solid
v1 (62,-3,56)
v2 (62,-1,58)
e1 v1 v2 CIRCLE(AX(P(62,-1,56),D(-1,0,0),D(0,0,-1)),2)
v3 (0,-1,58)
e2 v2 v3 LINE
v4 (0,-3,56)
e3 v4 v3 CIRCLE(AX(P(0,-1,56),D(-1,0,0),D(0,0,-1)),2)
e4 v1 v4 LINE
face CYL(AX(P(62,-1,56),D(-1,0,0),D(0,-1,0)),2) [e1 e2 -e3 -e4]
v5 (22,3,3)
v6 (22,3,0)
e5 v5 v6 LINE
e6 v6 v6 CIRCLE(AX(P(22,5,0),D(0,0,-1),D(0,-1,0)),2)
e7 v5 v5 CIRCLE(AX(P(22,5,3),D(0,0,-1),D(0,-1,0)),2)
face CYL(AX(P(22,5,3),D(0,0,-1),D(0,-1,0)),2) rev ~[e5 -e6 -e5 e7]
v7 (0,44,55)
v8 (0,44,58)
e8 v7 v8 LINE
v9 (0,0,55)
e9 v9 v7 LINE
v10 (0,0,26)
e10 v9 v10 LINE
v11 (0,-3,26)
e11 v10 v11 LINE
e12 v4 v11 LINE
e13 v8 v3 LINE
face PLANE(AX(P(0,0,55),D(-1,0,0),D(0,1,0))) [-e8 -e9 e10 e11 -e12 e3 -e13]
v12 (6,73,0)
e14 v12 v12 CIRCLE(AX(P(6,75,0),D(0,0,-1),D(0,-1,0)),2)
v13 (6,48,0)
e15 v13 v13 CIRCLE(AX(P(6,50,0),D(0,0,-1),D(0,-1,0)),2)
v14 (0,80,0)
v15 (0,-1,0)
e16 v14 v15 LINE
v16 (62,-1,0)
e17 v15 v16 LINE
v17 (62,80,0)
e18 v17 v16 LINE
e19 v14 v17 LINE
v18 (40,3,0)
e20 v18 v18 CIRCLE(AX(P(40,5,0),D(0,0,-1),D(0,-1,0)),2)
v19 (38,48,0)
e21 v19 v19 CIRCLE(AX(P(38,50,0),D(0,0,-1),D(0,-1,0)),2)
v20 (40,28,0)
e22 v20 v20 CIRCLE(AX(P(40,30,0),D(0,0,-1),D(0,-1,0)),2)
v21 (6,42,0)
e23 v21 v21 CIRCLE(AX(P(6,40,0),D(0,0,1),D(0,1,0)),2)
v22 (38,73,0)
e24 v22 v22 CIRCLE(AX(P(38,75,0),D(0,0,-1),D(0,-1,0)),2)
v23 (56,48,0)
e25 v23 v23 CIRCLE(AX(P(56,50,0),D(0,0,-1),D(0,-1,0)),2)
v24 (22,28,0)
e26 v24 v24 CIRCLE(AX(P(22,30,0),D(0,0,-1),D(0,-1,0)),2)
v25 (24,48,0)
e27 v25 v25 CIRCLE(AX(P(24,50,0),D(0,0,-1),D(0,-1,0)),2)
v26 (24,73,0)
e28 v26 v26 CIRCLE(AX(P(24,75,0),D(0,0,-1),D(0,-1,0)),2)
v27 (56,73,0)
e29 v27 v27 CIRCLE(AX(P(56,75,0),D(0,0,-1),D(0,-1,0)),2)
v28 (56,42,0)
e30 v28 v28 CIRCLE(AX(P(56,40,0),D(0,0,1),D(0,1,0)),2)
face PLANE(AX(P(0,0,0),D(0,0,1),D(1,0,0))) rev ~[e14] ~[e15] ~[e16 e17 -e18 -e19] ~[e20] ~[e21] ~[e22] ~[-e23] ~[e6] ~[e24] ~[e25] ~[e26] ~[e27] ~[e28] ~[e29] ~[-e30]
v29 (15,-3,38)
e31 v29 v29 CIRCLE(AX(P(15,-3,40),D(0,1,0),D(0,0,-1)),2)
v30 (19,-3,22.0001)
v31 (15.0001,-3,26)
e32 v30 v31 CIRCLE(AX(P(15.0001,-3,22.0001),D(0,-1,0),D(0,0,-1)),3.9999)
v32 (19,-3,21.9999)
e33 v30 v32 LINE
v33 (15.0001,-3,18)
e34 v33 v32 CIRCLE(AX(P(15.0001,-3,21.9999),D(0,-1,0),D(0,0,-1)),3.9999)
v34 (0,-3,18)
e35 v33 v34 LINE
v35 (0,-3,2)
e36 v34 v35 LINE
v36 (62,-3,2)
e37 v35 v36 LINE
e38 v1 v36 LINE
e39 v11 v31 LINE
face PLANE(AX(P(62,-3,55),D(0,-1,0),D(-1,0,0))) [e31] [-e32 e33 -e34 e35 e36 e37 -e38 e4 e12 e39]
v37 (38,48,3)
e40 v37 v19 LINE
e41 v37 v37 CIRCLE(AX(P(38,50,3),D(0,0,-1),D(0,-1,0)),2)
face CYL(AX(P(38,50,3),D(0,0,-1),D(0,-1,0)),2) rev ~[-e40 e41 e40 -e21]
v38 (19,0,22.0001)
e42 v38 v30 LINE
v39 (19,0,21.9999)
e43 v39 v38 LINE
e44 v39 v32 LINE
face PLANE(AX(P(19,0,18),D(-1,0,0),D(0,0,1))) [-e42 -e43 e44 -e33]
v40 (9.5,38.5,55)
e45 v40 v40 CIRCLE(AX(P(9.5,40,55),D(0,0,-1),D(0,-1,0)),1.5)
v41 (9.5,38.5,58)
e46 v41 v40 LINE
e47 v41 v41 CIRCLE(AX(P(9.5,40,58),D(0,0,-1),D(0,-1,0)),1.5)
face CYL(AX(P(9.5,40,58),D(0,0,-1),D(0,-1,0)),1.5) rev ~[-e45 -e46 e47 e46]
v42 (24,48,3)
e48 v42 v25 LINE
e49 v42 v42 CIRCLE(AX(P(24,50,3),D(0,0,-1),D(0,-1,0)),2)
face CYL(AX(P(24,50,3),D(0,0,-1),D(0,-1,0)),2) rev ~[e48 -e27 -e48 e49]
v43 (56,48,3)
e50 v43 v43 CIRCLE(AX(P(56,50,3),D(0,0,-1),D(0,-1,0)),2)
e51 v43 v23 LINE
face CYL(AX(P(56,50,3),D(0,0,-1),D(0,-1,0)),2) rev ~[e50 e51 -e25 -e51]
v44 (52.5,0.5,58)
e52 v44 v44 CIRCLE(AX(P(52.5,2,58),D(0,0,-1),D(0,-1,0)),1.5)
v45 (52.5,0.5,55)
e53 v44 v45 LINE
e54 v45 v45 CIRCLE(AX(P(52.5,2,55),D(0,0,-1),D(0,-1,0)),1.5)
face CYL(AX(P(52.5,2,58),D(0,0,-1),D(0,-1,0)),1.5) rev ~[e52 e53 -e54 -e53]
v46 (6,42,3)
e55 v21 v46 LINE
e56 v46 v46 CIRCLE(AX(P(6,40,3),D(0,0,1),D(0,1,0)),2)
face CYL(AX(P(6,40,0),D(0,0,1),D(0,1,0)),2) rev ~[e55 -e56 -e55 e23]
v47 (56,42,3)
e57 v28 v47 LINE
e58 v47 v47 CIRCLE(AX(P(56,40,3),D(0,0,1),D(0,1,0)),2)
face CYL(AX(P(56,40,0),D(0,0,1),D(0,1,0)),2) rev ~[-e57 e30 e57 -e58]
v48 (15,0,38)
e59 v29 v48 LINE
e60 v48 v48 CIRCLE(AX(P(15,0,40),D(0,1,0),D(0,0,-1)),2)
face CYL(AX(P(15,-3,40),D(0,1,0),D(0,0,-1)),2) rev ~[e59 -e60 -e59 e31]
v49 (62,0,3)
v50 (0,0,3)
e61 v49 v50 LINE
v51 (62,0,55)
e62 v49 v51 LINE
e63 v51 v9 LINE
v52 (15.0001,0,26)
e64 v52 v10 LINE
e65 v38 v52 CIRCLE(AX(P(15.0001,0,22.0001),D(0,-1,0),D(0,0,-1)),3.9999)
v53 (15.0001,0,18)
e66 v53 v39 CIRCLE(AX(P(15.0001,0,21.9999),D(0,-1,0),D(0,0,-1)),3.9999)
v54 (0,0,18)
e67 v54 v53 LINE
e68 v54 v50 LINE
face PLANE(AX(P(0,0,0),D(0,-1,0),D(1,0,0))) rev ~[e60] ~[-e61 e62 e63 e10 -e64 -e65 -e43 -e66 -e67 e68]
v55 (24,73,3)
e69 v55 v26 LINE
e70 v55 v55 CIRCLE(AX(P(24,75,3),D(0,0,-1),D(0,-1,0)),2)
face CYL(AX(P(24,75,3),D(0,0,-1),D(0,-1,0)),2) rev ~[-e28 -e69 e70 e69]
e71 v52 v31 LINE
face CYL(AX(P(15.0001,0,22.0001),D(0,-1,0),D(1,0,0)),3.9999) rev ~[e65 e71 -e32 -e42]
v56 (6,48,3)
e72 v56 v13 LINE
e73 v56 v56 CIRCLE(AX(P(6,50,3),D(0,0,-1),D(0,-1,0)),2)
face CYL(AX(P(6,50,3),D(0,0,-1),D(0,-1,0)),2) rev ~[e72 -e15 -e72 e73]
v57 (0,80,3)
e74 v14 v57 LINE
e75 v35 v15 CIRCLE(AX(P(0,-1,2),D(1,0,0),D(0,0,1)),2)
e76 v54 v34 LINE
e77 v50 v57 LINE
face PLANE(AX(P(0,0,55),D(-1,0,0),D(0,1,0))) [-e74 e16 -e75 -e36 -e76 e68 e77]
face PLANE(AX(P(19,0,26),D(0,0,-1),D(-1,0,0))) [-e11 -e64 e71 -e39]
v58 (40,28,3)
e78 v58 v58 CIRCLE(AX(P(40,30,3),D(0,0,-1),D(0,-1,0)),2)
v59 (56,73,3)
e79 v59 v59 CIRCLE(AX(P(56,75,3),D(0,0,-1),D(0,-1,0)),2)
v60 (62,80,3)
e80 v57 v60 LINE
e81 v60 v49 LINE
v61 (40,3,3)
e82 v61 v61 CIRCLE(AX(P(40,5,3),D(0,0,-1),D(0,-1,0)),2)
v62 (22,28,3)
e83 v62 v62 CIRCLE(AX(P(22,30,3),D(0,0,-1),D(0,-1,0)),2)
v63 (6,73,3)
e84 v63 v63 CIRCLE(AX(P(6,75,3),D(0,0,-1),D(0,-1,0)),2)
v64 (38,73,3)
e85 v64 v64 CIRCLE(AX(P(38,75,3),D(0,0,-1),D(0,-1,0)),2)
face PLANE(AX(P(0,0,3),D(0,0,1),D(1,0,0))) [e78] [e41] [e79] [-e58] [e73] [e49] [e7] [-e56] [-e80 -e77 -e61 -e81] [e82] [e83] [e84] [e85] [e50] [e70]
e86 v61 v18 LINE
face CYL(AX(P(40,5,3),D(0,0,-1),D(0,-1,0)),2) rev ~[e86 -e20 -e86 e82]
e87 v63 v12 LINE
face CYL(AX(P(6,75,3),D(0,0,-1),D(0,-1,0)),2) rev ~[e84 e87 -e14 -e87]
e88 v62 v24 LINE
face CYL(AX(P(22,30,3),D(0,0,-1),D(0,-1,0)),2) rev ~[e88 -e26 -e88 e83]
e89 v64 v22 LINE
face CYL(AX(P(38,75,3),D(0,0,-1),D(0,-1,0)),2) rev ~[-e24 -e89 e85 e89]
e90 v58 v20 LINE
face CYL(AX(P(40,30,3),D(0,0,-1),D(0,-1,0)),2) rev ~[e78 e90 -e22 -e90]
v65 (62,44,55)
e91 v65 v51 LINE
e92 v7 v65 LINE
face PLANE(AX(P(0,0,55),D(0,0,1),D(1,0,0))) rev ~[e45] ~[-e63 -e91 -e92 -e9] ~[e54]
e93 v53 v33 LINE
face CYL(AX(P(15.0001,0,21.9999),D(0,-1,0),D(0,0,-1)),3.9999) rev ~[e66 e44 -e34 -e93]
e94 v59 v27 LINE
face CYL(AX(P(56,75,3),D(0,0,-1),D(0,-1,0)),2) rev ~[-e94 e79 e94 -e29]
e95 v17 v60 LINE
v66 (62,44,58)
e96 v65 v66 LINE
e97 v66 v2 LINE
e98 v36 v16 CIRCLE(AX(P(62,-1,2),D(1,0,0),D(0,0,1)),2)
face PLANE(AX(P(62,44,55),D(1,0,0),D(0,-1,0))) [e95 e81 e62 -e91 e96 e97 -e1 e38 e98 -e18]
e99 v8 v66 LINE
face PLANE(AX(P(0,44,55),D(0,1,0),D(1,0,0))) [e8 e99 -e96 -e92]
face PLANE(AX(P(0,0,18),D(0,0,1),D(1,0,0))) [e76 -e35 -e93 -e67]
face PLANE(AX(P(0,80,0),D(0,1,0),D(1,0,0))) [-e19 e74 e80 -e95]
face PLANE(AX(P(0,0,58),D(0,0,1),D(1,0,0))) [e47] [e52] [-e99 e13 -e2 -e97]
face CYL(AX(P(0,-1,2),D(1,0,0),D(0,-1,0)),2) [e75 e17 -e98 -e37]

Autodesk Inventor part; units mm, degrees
ref_plane "YZ Plane" through (0, 0, 0) normal (1, 0, 0) x (0, 1, 0)
ref_plane "XZ Plane" through (0, 0, 0) normal (0, 1, 0) x (-1, 0, 0)
ref_plane "XY Plane" through (0, 0, 0) normal (0, 0, 1) x (1, 0, 0)
sketch "Szkic1" plane through (0, 0, 0) normal (0, 0, 1) x (1, 0, 0)
  line L0 (0, 80) -> (62, 80)
  line L1 (62, 80) -> (62, 0)
  line L2 (62, 0) -> (0, 0)
  line L3 (0, 0) -> (0, 80)
  point P0 (0, 0)
  dimension "d0" = 80
  dimension "d1" = 62
extrude "Wyciągnięcie proste1" add sketch "Szkic1" along normal blind 3
sketch "Szkic2" plane through (0, 0, 3) normal (0, 0, 1) x (1, 0, 0)
  line L0 (0, 80) -> (0, 0) projected
  line L1 (62, 80) -> (0, 80) projected
  line L2 (31, 80) -> (31, 0) construction
  line L3 (0, 0) -> (62, 0) projected
  line L4 (56, 75) -> (56, 50) construction
  line L5 (56, 62.5) -> (62, 62.5) construction
  line L6 (40, 30) -> (40, 5) construction
  line L7 (40, 17.5) -> (62.4441, 17.5) construction
  point P0 (6, 75)
  point P1 (24, 75)
  point P2 (24, 50)
  point P3 (6, 50)
  point P4 (38, 50)
  point P5 (38, 75)
  point P6 (22, 30)
  point P7 (22, 5)
  dimension "d4" = 18
  dimension "d5" = 25
  dimension "d6" = 6
  dimension "d7" = 5
  dimension "d10" = 32
  dimension "d15" = 18
  dimension "d16" = 25
  dimension "d17" = 45
hole "Otwór1" at (6, 75, 3) at (24, 75, 3) at (24, 50, 3) at (6, 50, 3) at (38, 50, 3) at (56, 50, 3) at (56, 75, 3) at (38, 75, 3) at (22, 30, 3) at (40, 30, 3) at (40, 5, 3) at (22, 5, 3) direction (0, 0, -1) diameter 4 end through all
sketch "Szkic3" plane through (0, 0, 0) normal (0, -1, 0) x (1, 0, 0)
  line L0 (0, 0) -> (62, 0)
  line L1 (62, 0) -> (62, 55)
  line L2 (62, 55) -> (0, 55)
  line L3 (0, 55) -> (0, 0)
  line L4 (62, 0) -> (62, 3) projected
  point P0 (62, 1.5)
  dimension "d25" = 55
extrude "Wyciągnięcie proste2" add sketch "Szkic3" along normal blind 3
sketch "Szkic4" plane through (0, 0, 55) normal (0, 0, 1) x (1, 0, 0)
  line L0 (62, 80) -> (62, -3) projected
  line L1 (62, -3) -> (0, -3)
  line L2 (0, -3) -> (0, 44)
  line L3 (0, 44) -> (62, 44)
  line L4 (62, 44) -> (62, -3)
  line L5 (0, 0) -> (0, -3) projected
  point P0 (0, -1.5)
  dimension "d28" = 47
extrude "Wyciągnięcie proste3" add sketch "Szkic4" along normal blind 3
sketch "Szkic5" plane through (0, 0, 0) normal (0, 0, -1) x (-1, 0, 0)
  line L0 (0, -3) -> (-62, -3) projected
  line L1 (0, -3) -> (0, 80) projected
  line L2 (-31, -3) -> (-31, 80) construction
  line L3 (-62, 80) -> (0, 80) projected
  point P0 (0, 0)
  point P1 (-6, 40)
  point P2 (-56, 40)
  dimension "d31" = 43
  dimension "d32" = 6
hole "Otwór2" at (6, 40, 0) at (56, 40, 0) direction (0, 0, 1) diameter 4 end up to surface
thread "Gwint1" size "M4x0.7" class "6H" standard "ANSI Metric M Profile" full length
thread "Gwint2" size "M4x0.7" class "6H" standard "ANSI Metric M Profile" full length
thread "Gwint3" size "M4x0.7" class "6H" standard "ANSI Metric M Profile" full length
thread "Gwint4" size "M4x0.7" class "6H" standard "ANSI Metric M Profile" full length
thread "Gwint5" size "M4x0.7" class "6H" standard "ANSI Metric M Profile" full length
thread "Gwint6" size "M4x0.7" class "6H" standard "ANSI Metric M Profile" full length
thread "Gwint7" size "M4x0.7" class "6H" standard "ANSI Metric M Profile" full length
thread "Gwint8" size "M4x0.7" class "6H" standard "ANSI Metric M Profile" full length
thread "Gwint9" size "M4x0.7" class "6H" standard "ANSI Metric M Profile" full length
thread "Gwint10" size "M4x0.7" class "6H" standard "ANSI Metric M Profile" full length
thread "Gwint11" size "M4x0.7" class "6H" standard "ANSI Metric M Profile" full length
thread "Gwint12" size "M4x0.7" class "6H" standard "ANSI Metric M Profile" full length
thread "Gwint13" size "M4x0.7" class "6H" standard "ANSI Metric M Profile" full length
thread "Gwint14" size "M4x0.7" class "6H" standard "ANSI Metric M Profile" full length
sketch "Szkic6" plane through (0, 0, 0) normal (0, 1, 0) x (1, 0, 0)
  line L0 (0, -18) -> (19, -18)
  line L1 (19, -18) -> (19, -26)
  line L2 (19, -26) -> (0, -26)
  line L3 (0, -26) -> (0, -18)
  line L4 (62, -3) -> (0, -3) projected
  point P0 (0, 0)
  dimension "d68" = 15
  dimension "d69" = 8
  dimension "d70" = 19
extrude "Wyciągnięcie proste4" cut sketch "Szkic6" against normal through all
full round fillet "Zaokrąglenie1" first side at (6.3333, -1, 18) centre faces at (19, -1, 20.6667) second side at (6.3333, -2, 26)
sketch "Szkic7" plane through (0, -3, 0) normal (0, -1, 0) x (1, 0, 0)
  line L0 (0, 58) -> (62, 58) projected
  line L1 (0, 26) -> (0, 58) projected
  point P0 (0, 0)
  point P1 (15, 40)
  dimension "d73" = 18
  dimension "d74" = 15
hole "Otwór3" at (15, -3, 40) direction (0, 1, 0) diameter 4 end through all
fillet "Zaokrąglenie2" radius 2 2 edges at (31, -3, 58) (31, -3, 0)
sketch "Szkic8" plane through (0, 0, 58) normal (0, 0, 1) x (1, 0, 0)
  line L0 (62, 44) -> (0, 44) projected
  line L1 (31, 44) -> (31, 0) construction
  line L2 (62, 0) -> (0, 0) projected
  line L3 (0, 80) -> (0, 0) projected
  point P0 (9.5, 40)
  point P1 (52.5, 2)
  dimension "d83" = 43
  dimension "d84" = 38
  dimension "d85" = 21.5
  dimension "d86" = 4
hole "Otwór4" at (9.5, 40, 58) at (52.5, 2, 58) direction (0, 0, -1) diameter 3 depth 8 tip angle 118
properties part number "gantry"
